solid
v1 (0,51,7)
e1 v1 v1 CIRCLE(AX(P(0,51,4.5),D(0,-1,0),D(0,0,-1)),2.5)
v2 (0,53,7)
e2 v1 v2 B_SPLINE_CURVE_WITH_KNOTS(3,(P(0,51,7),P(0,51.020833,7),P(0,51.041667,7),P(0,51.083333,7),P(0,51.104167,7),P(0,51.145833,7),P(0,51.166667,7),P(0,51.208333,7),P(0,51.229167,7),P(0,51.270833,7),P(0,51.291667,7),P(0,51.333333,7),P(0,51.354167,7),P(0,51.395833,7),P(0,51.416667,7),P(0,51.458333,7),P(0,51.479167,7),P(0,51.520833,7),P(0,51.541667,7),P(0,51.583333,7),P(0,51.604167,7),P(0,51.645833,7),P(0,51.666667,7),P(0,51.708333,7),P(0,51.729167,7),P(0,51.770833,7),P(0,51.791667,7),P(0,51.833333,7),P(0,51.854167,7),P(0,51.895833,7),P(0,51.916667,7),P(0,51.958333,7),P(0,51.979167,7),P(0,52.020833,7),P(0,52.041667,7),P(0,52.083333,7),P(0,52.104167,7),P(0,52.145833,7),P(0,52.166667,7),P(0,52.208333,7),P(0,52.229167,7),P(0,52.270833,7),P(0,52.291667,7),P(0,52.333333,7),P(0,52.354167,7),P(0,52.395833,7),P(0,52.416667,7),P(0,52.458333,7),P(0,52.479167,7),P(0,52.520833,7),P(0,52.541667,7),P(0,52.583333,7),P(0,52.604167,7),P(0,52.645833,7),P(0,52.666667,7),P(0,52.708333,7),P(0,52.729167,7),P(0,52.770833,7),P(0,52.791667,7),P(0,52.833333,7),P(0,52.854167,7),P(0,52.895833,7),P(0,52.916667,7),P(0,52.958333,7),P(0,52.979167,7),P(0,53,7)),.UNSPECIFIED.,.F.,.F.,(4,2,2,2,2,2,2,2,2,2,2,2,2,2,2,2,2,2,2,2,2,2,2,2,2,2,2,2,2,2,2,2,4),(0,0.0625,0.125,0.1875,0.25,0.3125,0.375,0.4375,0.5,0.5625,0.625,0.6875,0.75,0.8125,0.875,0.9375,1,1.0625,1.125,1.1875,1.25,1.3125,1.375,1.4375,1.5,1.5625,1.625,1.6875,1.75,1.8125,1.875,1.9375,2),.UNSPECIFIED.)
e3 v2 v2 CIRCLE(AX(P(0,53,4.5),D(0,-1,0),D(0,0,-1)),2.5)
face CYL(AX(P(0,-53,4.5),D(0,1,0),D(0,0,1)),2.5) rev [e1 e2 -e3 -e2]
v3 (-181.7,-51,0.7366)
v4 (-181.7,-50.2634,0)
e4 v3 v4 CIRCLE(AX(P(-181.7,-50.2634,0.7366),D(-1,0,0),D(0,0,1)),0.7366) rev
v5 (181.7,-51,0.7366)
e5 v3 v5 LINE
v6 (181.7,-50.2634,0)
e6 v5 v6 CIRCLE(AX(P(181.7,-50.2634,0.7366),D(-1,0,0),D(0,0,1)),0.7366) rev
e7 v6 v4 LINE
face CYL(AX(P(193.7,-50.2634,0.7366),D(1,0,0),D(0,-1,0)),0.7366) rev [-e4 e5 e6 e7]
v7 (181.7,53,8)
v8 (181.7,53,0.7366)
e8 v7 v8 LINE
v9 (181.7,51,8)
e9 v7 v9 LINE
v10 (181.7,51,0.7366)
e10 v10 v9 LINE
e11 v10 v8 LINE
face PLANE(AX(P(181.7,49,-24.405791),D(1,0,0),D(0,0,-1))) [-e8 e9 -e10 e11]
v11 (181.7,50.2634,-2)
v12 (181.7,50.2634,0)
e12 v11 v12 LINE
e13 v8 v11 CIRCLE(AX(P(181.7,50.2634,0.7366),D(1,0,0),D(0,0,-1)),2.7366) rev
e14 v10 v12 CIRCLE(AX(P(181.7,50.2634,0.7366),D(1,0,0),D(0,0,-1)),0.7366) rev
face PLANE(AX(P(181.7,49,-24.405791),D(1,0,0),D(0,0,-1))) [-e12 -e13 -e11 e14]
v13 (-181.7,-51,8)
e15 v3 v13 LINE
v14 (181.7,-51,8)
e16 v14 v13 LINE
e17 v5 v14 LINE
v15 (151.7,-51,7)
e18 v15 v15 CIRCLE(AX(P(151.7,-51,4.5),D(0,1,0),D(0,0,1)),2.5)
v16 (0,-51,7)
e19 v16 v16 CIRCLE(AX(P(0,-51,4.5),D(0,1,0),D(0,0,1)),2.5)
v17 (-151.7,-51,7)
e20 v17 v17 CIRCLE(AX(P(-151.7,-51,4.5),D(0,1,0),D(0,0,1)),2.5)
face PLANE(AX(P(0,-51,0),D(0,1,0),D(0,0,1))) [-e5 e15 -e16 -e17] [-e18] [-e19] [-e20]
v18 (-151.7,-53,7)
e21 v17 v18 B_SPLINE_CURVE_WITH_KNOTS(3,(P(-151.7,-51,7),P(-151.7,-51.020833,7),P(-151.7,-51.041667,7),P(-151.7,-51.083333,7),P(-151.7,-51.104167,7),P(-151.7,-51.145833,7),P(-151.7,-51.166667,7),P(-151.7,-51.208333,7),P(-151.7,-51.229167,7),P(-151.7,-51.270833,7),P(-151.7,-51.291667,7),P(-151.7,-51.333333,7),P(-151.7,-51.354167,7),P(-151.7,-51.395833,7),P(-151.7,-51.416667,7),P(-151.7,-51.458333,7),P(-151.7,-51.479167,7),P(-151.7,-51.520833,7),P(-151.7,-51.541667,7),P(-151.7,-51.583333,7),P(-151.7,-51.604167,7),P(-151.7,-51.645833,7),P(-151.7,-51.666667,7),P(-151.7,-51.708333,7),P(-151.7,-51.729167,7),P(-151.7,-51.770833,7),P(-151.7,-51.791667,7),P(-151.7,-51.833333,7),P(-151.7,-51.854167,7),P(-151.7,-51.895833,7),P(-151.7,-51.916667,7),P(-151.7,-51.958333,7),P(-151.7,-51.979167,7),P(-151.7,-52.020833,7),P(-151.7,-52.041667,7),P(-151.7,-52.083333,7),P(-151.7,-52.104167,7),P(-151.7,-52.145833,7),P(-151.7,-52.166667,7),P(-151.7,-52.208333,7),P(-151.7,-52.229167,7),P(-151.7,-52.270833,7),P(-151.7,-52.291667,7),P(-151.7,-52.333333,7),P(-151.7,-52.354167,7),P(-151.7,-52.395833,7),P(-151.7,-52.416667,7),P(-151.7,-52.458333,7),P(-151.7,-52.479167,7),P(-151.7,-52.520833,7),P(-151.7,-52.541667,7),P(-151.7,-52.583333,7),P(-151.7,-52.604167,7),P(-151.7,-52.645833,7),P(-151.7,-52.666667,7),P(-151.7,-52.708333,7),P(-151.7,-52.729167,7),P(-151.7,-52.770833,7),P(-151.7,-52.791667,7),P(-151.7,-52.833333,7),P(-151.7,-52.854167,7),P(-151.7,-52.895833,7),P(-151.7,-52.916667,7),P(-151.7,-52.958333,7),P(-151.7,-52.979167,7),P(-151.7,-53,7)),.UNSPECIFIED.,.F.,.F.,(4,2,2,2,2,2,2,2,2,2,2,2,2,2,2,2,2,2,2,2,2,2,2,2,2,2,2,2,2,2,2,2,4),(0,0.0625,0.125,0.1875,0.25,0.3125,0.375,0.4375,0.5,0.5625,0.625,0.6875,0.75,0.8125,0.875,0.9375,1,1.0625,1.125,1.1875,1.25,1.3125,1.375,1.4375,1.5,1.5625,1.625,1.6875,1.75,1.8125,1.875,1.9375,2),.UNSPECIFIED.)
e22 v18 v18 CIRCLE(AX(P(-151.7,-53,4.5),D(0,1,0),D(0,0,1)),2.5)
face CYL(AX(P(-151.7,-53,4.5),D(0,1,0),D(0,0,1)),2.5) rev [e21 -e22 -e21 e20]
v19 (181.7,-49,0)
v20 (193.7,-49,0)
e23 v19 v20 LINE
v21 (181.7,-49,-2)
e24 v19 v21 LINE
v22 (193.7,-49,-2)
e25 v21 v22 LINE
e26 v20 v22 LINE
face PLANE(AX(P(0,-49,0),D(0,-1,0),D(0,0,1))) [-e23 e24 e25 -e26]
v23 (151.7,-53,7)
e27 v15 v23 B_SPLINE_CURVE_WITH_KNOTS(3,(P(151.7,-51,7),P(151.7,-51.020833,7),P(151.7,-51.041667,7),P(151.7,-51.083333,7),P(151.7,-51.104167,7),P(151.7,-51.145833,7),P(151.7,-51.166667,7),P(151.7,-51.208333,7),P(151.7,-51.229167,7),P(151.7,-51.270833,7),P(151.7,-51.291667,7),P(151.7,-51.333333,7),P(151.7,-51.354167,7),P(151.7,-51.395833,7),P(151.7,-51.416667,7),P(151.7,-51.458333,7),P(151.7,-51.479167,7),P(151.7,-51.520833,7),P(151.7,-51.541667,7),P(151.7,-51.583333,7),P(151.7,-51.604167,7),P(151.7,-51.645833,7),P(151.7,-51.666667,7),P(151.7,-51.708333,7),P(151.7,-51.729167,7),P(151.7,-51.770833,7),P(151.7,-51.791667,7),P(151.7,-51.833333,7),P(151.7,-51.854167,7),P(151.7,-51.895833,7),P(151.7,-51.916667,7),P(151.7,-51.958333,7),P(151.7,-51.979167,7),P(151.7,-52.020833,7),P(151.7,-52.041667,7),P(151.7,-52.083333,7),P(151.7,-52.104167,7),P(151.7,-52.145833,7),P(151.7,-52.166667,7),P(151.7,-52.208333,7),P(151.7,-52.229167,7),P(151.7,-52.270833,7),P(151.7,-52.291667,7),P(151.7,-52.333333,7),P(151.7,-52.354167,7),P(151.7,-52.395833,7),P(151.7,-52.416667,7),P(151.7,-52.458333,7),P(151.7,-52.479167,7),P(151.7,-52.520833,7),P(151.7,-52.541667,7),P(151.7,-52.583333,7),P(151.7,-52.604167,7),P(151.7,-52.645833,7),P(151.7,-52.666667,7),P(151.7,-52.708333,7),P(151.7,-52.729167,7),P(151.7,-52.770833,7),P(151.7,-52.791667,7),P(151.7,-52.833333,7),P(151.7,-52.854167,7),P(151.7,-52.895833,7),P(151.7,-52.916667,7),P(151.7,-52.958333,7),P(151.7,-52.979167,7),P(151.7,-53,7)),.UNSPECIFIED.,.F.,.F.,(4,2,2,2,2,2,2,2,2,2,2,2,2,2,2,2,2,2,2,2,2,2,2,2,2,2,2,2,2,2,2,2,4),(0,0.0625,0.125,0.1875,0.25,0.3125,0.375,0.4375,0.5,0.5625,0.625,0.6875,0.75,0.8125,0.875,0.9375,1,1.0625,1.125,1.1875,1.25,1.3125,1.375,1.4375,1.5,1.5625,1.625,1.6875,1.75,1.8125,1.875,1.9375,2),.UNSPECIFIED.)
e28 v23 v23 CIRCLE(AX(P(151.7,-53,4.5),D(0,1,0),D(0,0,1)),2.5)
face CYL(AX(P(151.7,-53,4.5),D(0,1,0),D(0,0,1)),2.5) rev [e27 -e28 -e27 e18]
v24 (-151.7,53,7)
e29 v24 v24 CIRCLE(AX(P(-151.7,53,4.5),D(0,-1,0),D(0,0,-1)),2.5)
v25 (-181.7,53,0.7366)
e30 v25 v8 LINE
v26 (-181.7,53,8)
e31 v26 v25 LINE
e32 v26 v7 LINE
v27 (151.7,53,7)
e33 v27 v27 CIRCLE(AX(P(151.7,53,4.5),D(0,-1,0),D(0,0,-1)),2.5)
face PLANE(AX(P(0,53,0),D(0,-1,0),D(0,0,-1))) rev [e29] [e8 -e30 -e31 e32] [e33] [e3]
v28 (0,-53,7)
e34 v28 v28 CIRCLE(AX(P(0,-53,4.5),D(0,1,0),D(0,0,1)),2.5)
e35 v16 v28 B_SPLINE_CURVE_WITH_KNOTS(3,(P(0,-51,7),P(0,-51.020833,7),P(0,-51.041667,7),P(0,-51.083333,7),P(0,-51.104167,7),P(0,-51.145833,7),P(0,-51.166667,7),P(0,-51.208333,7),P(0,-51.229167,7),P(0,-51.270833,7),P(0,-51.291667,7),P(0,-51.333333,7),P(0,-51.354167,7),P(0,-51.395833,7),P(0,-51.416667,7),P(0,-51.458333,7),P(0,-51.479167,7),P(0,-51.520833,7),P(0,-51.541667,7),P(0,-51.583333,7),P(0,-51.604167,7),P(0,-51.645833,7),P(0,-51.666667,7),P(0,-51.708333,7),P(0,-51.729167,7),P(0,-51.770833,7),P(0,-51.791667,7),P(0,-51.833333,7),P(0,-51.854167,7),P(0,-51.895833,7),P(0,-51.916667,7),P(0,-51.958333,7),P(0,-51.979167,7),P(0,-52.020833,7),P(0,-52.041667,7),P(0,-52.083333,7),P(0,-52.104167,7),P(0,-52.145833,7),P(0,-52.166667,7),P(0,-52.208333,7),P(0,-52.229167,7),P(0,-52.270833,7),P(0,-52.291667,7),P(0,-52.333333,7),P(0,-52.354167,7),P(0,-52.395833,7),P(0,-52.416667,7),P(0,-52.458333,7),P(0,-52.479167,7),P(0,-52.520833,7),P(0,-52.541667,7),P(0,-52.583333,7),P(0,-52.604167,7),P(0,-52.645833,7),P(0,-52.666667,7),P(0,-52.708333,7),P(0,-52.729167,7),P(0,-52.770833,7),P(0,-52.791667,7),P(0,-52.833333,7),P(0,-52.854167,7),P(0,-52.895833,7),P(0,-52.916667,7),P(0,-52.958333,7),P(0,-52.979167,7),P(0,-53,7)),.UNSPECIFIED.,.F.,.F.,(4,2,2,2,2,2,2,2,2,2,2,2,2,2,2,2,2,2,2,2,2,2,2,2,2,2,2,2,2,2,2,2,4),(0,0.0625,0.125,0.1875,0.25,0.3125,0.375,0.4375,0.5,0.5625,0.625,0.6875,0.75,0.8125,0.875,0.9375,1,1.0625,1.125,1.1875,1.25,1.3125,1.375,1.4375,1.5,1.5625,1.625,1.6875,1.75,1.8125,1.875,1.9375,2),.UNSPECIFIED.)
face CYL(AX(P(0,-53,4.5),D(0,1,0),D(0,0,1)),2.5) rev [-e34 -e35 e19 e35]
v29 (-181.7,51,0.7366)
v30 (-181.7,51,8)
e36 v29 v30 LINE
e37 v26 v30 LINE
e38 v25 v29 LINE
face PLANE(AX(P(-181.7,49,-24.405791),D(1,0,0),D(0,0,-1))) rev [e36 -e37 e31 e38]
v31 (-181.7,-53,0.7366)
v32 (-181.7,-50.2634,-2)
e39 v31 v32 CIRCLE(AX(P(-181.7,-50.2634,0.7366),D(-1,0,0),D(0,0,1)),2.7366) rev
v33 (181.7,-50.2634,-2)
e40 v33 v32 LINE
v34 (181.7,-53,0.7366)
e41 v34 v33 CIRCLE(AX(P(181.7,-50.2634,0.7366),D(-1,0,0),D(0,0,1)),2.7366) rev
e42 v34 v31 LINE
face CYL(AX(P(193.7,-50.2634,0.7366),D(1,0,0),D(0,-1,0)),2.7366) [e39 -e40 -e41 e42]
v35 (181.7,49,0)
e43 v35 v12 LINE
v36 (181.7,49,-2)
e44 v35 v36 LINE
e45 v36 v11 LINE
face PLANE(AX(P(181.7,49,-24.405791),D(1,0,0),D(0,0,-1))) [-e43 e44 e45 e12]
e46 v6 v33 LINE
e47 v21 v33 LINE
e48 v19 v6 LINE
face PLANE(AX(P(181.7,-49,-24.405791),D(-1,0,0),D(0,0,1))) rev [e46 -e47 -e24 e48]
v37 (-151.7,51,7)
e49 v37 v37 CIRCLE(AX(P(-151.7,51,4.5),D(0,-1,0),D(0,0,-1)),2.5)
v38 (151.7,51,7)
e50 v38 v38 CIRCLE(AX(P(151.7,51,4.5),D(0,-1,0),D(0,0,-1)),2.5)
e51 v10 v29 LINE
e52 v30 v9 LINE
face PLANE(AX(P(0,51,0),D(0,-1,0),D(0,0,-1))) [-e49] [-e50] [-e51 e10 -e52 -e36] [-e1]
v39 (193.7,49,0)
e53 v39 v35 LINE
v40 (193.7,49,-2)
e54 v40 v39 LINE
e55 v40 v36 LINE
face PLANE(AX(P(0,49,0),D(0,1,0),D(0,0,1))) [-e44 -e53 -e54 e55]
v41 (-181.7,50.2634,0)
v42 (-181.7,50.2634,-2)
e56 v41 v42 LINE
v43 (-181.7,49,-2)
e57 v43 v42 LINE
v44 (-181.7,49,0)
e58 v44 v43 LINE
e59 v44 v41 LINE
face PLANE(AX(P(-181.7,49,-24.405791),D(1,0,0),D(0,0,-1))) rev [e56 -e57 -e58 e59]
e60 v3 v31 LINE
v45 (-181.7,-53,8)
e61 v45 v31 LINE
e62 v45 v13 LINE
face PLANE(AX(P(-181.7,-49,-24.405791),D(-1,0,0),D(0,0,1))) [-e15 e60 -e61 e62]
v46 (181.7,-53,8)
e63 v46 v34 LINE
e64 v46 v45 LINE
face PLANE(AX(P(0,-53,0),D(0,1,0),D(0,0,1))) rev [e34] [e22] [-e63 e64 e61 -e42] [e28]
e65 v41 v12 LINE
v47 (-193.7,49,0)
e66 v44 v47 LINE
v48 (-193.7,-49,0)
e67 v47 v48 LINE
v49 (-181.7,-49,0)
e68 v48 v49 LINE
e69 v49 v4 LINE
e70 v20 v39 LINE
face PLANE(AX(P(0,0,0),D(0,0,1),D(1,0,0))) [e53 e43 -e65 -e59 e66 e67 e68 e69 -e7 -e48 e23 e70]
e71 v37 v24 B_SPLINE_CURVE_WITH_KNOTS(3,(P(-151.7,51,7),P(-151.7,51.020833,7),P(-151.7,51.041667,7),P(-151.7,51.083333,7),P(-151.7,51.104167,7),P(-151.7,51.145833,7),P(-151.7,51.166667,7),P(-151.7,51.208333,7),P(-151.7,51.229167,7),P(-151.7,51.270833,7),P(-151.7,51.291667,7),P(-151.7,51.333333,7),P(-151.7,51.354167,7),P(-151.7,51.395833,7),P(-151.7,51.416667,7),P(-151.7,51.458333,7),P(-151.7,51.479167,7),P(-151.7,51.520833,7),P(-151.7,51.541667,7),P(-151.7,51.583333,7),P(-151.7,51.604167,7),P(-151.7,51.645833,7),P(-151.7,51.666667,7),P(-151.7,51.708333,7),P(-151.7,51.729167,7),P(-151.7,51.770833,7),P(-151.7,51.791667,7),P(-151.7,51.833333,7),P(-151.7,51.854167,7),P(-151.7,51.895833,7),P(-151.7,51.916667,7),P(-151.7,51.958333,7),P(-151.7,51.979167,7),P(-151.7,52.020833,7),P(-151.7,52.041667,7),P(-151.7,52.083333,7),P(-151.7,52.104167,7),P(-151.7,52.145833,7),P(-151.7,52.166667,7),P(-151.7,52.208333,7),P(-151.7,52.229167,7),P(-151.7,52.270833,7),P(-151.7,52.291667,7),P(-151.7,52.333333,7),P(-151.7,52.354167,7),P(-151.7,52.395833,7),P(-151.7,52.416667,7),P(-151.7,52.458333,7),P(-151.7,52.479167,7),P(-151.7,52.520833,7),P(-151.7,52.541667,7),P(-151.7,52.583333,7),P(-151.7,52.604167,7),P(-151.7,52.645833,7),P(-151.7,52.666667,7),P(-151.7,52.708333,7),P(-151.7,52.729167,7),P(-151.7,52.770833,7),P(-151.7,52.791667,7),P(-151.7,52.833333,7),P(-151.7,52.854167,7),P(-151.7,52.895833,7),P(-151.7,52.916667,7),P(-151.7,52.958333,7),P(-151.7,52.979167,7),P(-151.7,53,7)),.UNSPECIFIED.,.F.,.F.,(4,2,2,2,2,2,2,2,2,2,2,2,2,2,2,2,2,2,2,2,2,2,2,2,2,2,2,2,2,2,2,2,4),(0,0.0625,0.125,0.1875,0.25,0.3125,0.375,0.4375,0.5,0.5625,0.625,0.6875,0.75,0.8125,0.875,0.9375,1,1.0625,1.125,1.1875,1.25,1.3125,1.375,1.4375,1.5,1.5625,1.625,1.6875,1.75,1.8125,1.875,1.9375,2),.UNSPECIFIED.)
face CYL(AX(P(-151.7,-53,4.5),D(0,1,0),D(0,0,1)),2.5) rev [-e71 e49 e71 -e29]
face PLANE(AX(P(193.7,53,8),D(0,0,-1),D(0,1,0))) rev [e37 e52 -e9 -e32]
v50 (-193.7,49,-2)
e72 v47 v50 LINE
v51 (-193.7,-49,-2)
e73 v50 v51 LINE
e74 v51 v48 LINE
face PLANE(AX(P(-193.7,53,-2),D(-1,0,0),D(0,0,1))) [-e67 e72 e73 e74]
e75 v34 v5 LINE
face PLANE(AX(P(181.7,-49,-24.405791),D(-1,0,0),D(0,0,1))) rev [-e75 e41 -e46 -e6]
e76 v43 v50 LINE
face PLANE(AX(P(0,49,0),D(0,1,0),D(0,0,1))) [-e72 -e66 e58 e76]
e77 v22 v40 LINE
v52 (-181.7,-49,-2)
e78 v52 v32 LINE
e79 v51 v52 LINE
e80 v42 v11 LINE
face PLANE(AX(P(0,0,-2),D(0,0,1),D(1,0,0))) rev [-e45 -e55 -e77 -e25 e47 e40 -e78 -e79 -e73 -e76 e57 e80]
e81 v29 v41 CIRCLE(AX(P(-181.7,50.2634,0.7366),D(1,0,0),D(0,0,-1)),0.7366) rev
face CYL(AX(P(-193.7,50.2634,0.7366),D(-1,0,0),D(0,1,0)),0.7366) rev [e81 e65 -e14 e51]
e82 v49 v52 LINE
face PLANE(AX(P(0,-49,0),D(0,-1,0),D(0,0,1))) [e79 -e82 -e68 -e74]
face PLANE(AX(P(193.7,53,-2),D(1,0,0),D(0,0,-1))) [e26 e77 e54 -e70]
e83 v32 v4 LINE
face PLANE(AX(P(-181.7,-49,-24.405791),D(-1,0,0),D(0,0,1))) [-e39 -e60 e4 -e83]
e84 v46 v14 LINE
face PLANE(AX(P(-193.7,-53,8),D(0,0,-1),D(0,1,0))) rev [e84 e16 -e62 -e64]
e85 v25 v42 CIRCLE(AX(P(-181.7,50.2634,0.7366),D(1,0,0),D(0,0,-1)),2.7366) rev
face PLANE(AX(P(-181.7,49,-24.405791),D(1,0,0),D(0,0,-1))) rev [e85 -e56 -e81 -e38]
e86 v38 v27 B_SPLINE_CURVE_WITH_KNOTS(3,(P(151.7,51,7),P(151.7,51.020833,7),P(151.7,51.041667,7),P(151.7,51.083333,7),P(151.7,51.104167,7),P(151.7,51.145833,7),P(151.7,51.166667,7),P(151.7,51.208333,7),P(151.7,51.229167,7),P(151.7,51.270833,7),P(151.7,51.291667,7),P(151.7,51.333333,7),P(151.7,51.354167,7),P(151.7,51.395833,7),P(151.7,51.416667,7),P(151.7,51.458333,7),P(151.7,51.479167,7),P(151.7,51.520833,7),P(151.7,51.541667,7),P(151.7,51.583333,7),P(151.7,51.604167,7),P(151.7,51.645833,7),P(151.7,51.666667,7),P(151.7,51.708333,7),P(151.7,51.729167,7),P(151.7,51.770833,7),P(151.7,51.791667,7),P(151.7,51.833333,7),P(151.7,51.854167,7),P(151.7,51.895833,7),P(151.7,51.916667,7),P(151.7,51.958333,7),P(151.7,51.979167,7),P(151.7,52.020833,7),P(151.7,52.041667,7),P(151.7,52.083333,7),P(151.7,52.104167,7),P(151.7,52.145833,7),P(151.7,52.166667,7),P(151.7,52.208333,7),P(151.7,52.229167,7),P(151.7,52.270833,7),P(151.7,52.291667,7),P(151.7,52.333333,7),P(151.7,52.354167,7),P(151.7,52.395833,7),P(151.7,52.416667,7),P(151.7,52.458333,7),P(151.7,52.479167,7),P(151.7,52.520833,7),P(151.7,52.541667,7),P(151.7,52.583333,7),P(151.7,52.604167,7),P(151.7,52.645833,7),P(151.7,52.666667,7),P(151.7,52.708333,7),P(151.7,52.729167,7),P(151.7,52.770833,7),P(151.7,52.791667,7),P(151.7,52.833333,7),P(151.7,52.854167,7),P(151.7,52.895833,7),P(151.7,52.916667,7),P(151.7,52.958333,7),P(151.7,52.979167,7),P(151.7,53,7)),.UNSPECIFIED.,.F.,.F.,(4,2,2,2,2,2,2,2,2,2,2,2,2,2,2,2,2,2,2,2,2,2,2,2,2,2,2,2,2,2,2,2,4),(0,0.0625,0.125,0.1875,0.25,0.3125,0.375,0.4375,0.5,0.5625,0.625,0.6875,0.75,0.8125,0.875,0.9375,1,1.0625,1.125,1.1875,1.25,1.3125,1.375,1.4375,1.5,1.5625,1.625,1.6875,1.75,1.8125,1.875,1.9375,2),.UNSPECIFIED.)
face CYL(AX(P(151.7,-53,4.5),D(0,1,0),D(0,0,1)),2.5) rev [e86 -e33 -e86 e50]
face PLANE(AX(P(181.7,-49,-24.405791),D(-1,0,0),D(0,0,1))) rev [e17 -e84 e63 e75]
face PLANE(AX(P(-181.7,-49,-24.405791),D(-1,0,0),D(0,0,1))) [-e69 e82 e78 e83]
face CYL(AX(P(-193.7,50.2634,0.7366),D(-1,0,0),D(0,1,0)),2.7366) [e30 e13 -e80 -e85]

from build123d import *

# Parameters (mm, degrees)
SKETCH1_W                    = 387.4
SKETCH1_H                    = 106
BASE_FLANGE1_DEPTH           = 2
EDGE_FLANGE1_STRIP_W         = 9.4732
EDGE_FLANGE1_STRIP_H         = 2
EDGE_FLANGE1_STRIP_CUT_DEPTH = 387.4
EDGE_FLANGE1_DEPTH           = 387.4
EDGE_FLANGE2_STRIP_W         = 9.4732
EDGE_FLANGE2_STRIP_H         = 2
EDGE_FLANGE2_STRIP_CUT_DEPTH = 387.4
EDGE_FLANGE2_DEPTH           = 387.4
SKETCH14_W                   = 73.905952632
SKETCH14_H                   = 44.03163087
CUT_EXTRUDE1_DEPTH           = 4
MIRROR2_COPY_1_SKETCH_W      = 73.905952632
MIRROR2_COPY_1_SKETCH_H      = 44.03163087
MIRROR2_COPY_1_DEPTH         = 4
CUT_EXTRUDE2_DEPTH           = 221.95178207
CUT_EXTRUDE2_DEPTH_BACK      = 221.95178207
SKETCH15_R                   = 2.5


# Sheet-metal steps are written as plain solids
with BuildPart() as part:
    # Sketch1 → Base-Flange1 (new body)
    with BuildSketch(Plane.XY):
        Rectangle(SKETCH1_W, SKETCH1_H)
    extrude(amount=-BASE_FLANGE1_DEPTH)

    # Edge-Flange1 strip (across the edge) → Edge-Flange1 strip cut (cut)
    with BuildSketch(Plane(origin=(193.7, 53, 0), x_dir=(0, -1, 0), z_dir=(-1, 0, 0))):
        with Locations((-2, -1)):
            Rectangle(EDGE_FLANGE1_STRIP_W, EDGE_FLANGE1_STRIP_H)
    extrude(amount=EDGE_FLANGE1_STRIP_CUT_DEPTH, mode=Mode.SUBTRACT)

    # Edge-Flange1 section (across the edge) → Edge-Flange1 (add)
    with BuildSketch(Plane(origin=(193.7, 53, 0), x_dir=(0, -1, 0), z_dir=(-1, 0, 0))):
        with BuildLine():
            Line((0, 0.7366), (0, 8))
            Line((0, 8), (2, 8))
            Line((2, 8), (2, 0.7366))
            ThreePointArc((2, 0.7366), (2.215745145, 0.215745145), (2.7366, 0))
            Line((2.7366, 0), (2.7366, -2))
            ThreePointArc((2.7366, -2), (0.801531583, -1.198468417), (0, 0.7366))
        make_face()
    extrude(amount=EDGE_FLANGE1_DEPTH)

    # Edge-Flange2 strip (across the edge) → Edge-Flange2 strip cut (cut)
    with BuildSketch(Plane(origin=(-193.7, -53, 0), x_dir=(0, 1, 0), z_dir=(1, 0, 0))):
        with Locations((-2, -1)):
            Rectangle(EDGE_FLANGE2_STRIP_W, EDGE_FLANGE2_STRIP_H)
    extrude(amount=EDGE_FLANGE2_STRIP_CUT_DEPTH, mode=Mode.SUBTRACT)

    # Edge-Flange2 section (across the edge) → Edge-Flange2 (add)
    with BuildSketch(Plane(origin=(-193.7, -53, 0), x_dir=(0, 1, 0), z_dir=(1, 0, 0))):
        with BuildLine():
            Line((0, 0.7366), (0, 8))
            Line((0, 8), (2, 8))
            Line((2, 8), (2, 0.7366))
            ThreePointArc((2, 0.7366), (2.215745145, 0.215745145), (2.7366, 0))
            Line((2.7366, 0), (2.7366, -2))
            ThreePointArc((2.7366, -2), (0.801531583, -1.198468417), (0, 0.7366))
        make_face()
    extrude(amount=EDGE_FLANGE2_DEPTH)

    # Sketch14 → Cut-Extrude1 (cut)
    with BuildSketch(Plane(origin=(0, 53, 0), x_dir=(1, 0, 0), z_dir=(0, 1, 0))):
        with Locations((-218.652976316, 2.389975087)):
            Rectangle(SKETCH14_W, SKETCH14_H)
    cut_extrude1 = extrude(amount=-CUT_EXTRUDE1_DEPTH, mode=Mode.SUBTRACT)

    # Mirror1: Cut-Extrude1 across plane
    add(cut_extrude1.mirror(Plane.ZX), mode=Mode.SUBTRACT)

    # Mirror2: Cut-Extrude1 across plane
    add(cut_extrude1.mirror(Plane(origin=(0, 0, 0), x_dir=(0, 0, 1), z_dir=(1, 0, 0))), mode=Mode.SUBTRACT)

    # Mirror2 copy 1 sketch → Mirror2 copy 1 (cut)
    with BuildSketch(Plane(origin=(0, -53, 0), x_dir=(-1, 0, 0), z_dir=(0, -1, 0))):
        with Locations((-218.652976316, 2.389975087)):
            Rectangle(MIRROR2_COPY_1_SKETCH_W, MIRROR2_COPY_1_SKETCH_H)
    extrude(amount=-MIRROR2_COPY_1_DEPTH, mode=Mode.SUBTRACT)

    # Sketch15 → Cut-Extrude2 (cut, two sides: drawn at the far end of the back side and taken through both)
    with BuildSketch(Plane(origin=(0, 53, 0), x_dir=(1, 0, 0), z_dir=(0, 1, 0)).offset(-CUT_EXTRUDE2_DEPTH_BACK)):
        with Locations(Location((151.7, -4.5, 0), (0, 0, 270))):
            Circle(SKETCH15_R)
        with Locations(Location((0, -4.5, 0), (0, 0, 270))):
            Circle(SKETCH15_R)
        with Locations(Location((-151.7, -4.5, 0), (0, 0, 270))):
            Circle(SKETCH15_R)
    extrude(amount=CUT_EXTRUDE2_DEPTH + CUT_EXTRUDE2_DEPTH_BACK, mode=Mode.SUBTRACT)


solid = part.part
